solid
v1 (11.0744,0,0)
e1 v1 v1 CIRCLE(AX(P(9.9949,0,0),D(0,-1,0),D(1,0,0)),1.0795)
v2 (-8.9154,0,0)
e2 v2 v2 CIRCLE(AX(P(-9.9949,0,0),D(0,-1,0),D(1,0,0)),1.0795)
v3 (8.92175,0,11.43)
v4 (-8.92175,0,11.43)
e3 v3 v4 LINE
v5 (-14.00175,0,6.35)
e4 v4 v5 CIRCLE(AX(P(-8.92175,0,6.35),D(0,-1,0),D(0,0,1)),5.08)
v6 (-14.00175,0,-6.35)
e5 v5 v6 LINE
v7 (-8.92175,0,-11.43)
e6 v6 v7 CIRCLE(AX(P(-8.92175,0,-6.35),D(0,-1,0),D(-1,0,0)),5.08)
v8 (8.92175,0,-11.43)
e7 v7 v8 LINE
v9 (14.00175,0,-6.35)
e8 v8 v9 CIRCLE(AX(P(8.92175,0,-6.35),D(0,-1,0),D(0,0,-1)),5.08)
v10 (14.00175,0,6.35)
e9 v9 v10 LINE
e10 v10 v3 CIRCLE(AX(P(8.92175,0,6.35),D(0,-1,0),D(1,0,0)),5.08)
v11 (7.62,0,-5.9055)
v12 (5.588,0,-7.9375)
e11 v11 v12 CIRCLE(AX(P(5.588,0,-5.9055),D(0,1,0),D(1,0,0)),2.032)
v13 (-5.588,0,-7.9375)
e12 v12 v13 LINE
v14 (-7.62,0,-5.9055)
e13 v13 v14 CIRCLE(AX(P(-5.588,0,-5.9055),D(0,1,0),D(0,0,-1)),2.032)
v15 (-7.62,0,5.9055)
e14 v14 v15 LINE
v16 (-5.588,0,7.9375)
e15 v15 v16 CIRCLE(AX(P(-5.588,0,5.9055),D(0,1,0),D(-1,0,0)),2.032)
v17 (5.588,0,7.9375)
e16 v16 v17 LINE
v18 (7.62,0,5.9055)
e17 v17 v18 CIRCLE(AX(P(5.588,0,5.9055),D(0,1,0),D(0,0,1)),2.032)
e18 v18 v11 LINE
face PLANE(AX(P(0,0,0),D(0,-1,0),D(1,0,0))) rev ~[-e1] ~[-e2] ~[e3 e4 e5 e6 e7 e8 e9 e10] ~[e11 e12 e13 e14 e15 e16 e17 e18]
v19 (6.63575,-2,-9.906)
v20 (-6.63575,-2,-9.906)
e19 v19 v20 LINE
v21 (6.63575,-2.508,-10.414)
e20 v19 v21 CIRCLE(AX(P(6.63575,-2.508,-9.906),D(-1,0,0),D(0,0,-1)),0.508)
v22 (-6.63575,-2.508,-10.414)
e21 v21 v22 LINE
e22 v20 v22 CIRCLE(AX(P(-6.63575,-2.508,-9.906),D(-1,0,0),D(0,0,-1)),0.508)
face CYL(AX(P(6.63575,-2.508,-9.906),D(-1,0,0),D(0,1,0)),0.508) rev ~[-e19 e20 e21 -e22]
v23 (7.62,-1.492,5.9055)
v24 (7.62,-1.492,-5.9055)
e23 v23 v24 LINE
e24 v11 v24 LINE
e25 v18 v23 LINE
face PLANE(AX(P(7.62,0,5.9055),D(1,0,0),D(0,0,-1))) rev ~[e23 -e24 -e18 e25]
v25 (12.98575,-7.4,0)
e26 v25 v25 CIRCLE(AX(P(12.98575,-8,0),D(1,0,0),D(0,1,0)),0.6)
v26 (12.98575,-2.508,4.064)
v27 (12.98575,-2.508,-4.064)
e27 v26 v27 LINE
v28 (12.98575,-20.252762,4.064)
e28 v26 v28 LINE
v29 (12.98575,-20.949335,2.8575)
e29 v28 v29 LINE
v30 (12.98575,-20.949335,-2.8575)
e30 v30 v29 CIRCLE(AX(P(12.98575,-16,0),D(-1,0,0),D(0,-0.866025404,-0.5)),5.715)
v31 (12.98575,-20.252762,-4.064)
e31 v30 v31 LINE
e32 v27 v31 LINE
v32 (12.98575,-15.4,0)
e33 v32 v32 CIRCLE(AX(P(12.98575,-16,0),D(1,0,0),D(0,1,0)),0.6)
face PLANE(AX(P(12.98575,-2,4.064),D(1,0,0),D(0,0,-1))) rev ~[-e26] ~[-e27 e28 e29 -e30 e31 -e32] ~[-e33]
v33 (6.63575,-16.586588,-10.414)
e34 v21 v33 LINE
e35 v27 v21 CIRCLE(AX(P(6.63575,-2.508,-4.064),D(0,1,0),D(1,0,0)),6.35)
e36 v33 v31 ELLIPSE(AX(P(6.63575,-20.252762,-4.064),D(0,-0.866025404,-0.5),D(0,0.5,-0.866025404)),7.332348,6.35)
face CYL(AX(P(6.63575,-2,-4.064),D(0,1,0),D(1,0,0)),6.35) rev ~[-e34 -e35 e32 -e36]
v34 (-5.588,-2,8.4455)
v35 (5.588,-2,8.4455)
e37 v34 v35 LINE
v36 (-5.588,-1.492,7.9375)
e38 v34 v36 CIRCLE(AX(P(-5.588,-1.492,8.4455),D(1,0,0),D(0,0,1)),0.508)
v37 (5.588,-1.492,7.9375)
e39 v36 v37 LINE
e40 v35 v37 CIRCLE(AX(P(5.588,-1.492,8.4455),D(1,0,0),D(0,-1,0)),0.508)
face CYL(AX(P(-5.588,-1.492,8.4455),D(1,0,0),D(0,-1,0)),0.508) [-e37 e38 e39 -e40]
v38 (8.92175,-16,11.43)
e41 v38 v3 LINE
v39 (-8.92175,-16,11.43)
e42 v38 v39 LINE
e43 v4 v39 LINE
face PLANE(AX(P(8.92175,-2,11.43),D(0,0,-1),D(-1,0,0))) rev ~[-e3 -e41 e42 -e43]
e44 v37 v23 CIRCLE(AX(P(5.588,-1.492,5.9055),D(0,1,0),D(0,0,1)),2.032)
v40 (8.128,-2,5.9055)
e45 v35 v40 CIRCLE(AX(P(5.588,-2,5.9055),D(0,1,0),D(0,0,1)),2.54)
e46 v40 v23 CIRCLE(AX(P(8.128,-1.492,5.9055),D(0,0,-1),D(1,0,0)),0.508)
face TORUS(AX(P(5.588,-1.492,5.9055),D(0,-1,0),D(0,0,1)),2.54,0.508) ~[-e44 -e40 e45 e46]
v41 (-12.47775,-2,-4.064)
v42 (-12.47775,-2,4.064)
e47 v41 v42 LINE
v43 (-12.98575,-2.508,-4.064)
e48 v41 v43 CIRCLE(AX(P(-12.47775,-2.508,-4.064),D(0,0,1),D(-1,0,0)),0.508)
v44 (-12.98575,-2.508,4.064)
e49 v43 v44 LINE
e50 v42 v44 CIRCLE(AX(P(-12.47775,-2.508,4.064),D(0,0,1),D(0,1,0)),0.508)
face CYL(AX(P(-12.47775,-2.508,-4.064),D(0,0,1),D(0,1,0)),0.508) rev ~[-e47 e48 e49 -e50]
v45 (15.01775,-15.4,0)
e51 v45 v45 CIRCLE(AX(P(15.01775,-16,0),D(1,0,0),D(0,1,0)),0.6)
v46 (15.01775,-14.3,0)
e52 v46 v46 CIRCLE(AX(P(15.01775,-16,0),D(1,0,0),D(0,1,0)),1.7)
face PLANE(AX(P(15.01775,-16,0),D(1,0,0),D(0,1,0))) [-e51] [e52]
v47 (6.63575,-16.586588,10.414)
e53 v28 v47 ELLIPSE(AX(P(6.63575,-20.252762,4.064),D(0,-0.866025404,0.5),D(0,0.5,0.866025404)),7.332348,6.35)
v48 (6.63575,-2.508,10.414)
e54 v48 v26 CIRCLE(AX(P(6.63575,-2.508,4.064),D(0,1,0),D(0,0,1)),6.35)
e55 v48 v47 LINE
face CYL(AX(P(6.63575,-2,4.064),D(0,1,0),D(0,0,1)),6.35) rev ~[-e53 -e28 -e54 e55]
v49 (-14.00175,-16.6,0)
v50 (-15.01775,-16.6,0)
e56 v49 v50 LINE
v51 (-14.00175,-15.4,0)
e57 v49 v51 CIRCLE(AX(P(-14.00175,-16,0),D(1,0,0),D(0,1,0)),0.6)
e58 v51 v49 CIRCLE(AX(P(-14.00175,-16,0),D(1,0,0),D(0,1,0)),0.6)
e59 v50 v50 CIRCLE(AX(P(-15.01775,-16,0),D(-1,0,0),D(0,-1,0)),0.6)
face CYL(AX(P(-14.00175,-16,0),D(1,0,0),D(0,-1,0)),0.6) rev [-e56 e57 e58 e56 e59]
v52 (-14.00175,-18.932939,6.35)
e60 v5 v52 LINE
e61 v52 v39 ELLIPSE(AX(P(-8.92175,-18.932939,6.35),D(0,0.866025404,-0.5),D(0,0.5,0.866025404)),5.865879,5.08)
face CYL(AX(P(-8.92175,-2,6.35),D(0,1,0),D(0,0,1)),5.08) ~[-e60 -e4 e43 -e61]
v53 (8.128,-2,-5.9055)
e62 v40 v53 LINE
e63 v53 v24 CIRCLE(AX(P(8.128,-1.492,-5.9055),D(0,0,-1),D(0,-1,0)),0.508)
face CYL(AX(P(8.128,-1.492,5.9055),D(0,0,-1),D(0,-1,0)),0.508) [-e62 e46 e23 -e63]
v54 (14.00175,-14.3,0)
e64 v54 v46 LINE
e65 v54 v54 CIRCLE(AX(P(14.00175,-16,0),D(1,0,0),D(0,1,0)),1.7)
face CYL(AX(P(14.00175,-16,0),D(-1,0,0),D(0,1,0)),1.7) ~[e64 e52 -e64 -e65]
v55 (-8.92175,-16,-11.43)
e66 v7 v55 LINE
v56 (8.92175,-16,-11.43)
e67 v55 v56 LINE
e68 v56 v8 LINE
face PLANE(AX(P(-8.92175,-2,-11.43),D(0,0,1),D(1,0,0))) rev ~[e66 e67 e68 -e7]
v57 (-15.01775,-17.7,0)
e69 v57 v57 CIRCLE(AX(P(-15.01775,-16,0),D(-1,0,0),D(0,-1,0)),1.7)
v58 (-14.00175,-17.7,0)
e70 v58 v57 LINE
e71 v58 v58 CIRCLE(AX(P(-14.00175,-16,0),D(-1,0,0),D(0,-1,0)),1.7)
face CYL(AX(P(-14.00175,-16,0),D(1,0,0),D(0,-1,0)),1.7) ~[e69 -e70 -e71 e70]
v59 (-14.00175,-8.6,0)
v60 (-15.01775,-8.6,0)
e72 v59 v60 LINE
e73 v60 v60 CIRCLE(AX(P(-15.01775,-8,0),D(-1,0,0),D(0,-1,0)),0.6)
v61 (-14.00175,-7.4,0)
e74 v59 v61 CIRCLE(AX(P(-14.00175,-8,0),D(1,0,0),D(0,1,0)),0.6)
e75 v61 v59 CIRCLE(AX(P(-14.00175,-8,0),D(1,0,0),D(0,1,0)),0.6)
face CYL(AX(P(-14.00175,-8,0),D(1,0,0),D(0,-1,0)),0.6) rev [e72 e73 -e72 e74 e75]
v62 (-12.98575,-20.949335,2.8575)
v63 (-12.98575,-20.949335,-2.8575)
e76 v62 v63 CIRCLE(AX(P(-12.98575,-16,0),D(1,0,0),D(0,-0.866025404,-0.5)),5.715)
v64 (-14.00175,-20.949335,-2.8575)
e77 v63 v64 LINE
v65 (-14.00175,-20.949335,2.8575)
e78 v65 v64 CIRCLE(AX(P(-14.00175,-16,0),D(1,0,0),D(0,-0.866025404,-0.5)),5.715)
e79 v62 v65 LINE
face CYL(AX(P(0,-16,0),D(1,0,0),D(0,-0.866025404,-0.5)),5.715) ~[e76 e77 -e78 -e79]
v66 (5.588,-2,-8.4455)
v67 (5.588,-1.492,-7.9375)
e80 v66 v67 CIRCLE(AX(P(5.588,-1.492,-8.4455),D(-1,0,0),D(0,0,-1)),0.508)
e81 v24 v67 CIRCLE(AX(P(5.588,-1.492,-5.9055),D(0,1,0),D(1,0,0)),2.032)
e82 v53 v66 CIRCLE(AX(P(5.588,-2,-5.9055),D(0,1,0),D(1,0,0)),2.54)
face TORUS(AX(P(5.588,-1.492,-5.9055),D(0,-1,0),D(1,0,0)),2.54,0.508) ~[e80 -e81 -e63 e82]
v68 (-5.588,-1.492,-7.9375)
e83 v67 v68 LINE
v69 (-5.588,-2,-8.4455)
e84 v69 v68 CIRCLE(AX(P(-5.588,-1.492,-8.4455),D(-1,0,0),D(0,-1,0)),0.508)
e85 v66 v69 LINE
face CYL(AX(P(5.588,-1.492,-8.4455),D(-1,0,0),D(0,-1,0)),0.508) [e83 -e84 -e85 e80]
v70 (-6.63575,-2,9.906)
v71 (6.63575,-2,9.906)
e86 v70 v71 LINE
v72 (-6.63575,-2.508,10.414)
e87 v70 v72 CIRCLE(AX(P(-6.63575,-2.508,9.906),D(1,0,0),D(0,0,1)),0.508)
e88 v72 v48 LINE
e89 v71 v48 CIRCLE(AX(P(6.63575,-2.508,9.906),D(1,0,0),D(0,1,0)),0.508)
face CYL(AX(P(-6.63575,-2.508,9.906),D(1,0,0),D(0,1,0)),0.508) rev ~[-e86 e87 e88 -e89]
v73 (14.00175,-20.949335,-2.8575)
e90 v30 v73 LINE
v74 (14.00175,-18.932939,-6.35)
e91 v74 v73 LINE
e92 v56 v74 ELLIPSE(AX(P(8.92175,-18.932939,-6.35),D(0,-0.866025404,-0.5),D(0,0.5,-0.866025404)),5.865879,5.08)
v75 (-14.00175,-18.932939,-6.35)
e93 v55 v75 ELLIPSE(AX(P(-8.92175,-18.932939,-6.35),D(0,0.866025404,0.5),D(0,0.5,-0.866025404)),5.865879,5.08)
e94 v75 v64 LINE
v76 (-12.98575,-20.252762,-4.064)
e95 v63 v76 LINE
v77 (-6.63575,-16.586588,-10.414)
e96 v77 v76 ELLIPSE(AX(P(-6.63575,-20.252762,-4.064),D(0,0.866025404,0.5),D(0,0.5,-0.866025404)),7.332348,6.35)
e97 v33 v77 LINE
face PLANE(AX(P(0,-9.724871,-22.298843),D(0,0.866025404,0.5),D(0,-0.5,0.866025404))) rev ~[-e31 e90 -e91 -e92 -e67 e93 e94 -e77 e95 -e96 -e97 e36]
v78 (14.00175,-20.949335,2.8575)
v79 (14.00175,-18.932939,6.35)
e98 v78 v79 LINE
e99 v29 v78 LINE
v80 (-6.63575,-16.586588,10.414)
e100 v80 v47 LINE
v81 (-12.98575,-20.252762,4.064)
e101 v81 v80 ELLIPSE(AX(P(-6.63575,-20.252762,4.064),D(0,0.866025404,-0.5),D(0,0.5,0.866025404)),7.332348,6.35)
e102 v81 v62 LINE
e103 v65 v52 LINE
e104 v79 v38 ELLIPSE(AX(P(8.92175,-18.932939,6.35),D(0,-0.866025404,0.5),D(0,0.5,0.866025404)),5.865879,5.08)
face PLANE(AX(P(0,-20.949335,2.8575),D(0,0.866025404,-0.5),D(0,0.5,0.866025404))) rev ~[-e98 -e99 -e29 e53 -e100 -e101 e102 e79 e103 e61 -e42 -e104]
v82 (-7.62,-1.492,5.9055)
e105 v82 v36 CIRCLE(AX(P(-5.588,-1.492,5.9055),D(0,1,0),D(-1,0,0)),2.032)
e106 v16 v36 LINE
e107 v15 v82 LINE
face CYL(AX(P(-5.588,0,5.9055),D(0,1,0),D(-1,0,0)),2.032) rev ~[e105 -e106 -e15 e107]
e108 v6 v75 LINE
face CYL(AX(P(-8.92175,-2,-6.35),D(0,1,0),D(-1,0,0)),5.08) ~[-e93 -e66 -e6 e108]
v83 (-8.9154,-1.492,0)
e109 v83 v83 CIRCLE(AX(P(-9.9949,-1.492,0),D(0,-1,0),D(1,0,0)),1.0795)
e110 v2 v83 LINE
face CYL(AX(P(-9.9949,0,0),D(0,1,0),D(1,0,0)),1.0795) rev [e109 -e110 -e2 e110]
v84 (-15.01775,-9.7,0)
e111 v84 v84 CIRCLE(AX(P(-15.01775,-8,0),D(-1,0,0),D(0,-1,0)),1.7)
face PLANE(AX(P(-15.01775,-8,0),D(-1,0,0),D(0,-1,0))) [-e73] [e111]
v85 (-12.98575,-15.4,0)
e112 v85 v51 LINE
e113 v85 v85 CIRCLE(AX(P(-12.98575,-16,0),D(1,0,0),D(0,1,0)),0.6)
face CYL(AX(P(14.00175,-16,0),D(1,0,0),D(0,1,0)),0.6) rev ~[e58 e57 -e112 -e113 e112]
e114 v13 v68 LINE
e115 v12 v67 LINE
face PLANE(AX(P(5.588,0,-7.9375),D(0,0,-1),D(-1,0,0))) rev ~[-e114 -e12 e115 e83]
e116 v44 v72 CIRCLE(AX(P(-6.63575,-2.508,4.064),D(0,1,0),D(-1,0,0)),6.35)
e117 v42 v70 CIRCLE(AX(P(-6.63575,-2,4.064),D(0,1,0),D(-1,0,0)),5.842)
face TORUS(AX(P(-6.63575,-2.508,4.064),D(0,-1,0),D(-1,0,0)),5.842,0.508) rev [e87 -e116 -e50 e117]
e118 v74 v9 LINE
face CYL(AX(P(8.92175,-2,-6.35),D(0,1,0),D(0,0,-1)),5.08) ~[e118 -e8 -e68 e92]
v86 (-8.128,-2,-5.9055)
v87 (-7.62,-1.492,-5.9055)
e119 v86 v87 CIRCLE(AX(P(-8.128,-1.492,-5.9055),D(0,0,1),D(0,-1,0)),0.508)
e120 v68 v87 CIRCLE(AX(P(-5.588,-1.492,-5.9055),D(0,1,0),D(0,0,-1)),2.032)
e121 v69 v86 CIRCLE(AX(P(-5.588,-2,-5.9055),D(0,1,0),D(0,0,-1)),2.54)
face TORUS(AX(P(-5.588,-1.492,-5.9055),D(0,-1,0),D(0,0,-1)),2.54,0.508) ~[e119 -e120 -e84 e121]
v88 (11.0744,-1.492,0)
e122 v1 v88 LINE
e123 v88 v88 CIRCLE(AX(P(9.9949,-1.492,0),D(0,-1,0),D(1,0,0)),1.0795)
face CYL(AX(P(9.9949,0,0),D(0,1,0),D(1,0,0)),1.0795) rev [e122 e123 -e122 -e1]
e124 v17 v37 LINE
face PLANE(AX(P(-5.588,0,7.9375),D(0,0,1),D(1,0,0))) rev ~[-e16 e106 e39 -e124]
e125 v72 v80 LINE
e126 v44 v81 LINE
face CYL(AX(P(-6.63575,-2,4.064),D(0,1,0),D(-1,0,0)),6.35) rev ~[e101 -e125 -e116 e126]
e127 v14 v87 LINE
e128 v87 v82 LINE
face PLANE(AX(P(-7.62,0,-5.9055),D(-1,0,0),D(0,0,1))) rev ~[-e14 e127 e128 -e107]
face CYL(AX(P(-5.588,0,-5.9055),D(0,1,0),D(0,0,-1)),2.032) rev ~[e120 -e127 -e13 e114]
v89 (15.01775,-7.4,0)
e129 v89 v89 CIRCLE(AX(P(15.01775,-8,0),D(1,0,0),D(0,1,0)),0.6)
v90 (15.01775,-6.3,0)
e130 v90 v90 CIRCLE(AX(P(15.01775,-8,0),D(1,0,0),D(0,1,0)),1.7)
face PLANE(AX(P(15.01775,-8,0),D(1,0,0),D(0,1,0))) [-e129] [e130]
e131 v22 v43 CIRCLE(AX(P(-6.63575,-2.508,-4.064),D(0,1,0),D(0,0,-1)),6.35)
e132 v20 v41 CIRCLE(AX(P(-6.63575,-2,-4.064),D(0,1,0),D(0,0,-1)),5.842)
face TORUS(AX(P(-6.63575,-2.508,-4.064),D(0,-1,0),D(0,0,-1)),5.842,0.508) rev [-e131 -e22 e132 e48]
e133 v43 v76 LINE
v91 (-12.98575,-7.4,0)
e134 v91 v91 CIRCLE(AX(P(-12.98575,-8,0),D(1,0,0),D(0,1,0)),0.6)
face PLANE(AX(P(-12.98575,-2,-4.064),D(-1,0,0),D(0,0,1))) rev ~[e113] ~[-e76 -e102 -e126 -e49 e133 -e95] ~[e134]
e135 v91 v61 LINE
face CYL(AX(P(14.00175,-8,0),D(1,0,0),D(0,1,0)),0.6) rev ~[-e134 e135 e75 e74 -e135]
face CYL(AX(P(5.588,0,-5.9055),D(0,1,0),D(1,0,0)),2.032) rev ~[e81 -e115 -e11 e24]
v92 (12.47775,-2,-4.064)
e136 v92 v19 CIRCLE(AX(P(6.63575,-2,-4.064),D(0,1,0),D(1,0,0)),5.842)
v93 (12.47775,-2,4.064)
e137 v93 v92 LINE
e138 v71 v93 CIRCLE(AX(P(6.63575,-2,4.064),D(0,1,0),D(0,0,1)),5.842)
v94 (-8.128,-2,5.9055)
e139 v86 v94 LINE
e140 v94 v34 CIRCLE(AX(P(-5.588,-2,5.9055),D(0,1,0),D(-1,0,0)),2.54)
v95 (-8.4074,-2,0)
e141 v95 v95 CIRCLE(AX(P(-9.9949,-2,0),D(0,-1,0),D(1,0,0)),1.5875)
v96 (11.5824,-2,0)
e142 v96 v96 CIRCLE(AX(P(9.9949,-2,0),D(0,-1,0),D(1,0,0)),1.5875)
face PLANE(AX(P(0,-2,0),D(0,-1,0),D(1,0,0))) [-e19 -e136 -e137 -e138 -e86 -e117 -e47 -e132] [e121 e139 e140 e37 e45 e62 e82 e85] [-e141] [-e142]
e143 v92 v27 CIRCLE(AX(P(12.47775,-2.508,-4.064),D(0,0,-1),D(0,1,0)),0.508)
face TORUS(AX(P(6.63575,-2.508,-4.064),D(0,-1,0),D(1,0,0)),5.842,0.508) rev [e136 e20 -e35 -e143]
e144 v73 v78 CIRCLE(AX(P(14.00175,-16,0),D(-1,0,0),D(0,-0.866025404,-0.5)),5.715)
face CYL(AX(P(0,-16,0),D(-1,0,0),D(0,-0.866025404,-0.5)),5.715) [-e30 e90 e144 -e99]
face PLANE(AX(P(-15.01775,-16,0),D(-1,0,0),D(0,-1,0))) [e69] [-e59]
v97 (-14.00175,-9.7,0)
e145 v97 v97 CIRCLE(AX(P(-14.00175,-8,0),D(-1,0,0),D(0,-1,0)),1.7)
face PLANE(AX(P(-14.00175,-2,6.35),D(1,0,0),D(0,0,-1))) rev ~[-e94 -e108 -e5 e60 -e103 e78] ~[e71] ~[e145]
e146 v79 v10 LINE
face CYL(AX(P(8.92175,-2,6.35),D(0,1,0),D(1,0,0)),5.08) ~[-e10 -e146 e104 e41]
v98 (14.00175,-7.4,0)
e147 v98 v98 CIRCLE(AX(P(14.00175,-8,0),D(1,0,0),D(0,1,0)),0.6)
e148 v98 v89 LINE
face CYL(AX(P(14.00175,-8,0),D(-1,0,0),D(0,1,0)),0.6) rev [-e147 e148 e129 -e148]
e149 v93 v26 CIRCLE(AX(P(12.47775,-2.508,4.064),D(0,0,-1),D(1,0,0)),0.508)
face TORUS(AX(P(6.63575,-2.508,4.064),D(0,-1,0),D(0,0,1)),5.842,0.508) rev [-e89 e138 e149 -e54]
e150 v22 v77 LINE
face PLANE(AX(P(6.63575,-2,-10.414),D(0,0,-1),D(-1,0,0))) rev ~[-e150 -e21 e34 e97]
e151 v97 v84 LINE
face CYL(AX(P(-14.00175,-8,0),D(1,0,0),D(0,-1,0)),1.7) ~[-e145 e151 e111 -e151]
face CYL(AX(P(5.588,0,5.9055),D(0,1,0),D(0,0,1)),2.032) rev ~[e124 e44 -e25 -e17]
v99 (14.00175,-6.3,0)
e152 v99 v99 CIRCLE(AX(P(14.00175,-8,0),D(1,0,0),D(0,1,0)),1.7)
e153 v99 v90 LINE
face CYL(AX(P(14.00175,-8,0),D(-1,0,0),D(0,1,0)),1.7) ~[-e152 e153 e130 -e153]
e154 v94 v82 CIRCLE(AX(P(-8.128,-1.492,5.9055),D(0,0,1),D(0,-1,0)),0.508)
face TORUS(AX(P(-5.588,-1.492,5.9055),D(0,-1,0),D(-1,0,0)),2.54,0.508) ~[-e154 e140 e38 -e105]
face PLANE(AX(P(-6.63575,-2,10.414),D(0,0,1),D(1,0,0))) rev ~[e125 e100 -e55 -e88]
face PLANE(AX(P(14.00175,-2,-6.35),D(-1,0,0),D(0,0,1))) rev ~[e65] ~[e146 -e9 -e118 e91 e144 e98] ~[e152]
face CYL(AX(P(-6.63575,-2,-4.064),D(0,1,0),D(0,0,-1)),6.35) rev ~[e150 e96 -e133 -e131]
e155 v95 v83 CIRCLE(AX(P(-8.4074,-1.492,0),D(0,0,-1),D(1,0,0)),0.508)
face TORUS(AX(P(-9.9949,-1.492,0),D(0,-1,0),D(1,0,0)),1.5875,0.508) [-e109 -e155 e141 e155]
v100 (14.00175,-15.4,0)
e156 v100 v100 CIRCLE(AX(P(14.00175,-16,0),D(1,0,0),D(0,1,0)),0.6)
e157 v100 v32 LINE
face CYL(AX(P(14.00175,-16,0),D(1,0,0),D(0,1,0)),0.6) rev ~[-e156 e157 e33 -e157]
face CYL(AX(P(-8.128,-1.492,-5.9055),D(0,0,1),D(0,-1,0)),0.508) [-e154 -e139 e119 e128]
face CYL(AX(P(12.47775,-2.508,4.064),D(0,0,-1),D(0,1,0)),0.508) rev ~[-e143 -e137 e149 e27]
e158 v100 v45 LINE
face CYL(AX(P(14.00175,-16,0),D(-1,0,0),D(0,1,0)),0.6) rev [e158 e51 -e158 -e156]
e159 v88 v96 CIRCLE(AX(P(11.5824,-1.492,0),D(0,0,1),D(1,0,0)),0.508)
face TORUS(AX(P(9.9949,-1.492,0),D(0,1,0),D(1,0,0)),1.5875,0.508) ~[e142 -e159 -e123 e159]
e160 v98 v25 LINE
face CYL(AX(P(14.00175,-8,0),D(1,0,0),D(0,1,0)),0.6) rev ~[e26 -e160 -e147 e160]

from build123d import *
from build123d import SkipClean  # not in build123d's __all__

# Parameters (mm, degrees)
F0_R           = 1.0795
F1_DEPTH       = 2
F3_DEPTH       = 19.9898
F4_R           = 0.508
F5_R           = 0.6
F6_DEPTH       = 28.0045
F7_R           = 1.7
F7_R_2         = 0.6
F8_DEPTH       = 1.016
F9_R           = 1.7
F9_R_2         = 0.6
F10_DEPTH      = 1.016
F12_DEPTH      = 15.01875
F12_DEPTH_BACK = 15.01875


# Not quite as in the source:
# - after a boolean that leaves OpenCascade's solid faulty, fix() repairs it


with BuildPart() as f1:
    # F0 (on Front) → F1 (new body)
    with BuildSketch(Plane.XZ):
        with BuildLine():
            Line((8.92175, 11.43), (-8.92175, 11.43))
            ThreePointArc((-8.92175, 11.43), (-12.5138524484, 9.9421024484), (-14.00175, 6.35))
            Line((-14.00175, 6.35), (-14.00175, -6.35))
            ThreePointArc((-14.00175, -6.35), (-12.5138524484, -9.9421024484), (-8.92175, -11.43))
            Line((-8.92175, -11.43), (8.92175, -11.43))
            ThreePointArc((8.92175, -11.43), (12.5138524484, -9.9421024484), (14.00175, -6.35))
            Line((14.00175, -6.35), (14.00175, 6.35))
            ThreePointArc((14.00175, 6.35), (12.5138524484, 9.9421024484), (8.92175, 11.43))
        make_face()
        with Locations((-9.9949, 0)):
            Circle(F0_R, mode=Mode.SUBTRACT)
        with BuildLine():
            ThreePointArc((-7.62, 5.9055), (-7.0248409794, 7.3423409794), (-5.588, 7.9375))
            Line((-5.588, 7.9375), (5.588, 7.9375))
            ThreePointArc((5.588, 7.9375), (7.0248409794, 7.3423409794), (7.62, 5.9055))
            Line((7.62, 5.9055), (7.62, -5.9055))
            ThreePointArc((7.62, -5.9055), (7.0248409794, -7.3423409794), (5.588, -7.9375))
            Line((5.588, -7.9375), (-5.588, -7.9375))
            ThreePointArc((-5.588, -7.9375), (-7.0248409794, -7.3423409794), (-7.62, -5.9055))
            Line((-7.62, -5.9055), (-7.62, 5.9055))
        make_face(mode=Mode.SUBTRACT)
        with Locations((9.9949, 0)):
            Circle(F0_R, mode=Mode.SUBTRACT)
    extrude(amount=F1_DEPTH)

    # F2 (on face) → F3 (join)
    with BuildSketch(Plane.XZ.offset(2)):
        with BuildLine():
            Line((8.92175, 11.43), (-8.92175, 11.43))
            ThreePointArc((-8.92175, 11.43), (-12.5138524484, 9.9421024484), (-14.00175, 6.35))
            Line((-14.00175, 6.35), (-14.00175, -6.35))
            ThreePointArc((-14.00175, -6.35), (-12.5138524484, -9.9421024484), (-8.92175, -11.43))
            Line((-8.92175, -11.43), (8.92175, -11.43))
            ThreePointArc((8.92175, -11.43), (12.5138524484, -9.9421024484), (14.00175, -6.35))
            Line((14.00175, -6.35), (14.00175, 6.35))
            ThreePointArc((14.00175, 6.35), (12.5138524484, 9.9421024484), (8.92175, 11.43))
        make_face()
        with BuildLine():
            ThreePointArc((-12.98575, 4.064), (-11.1258780605, 8.5541280605), (-6.63575, 10.414))
            Line((-6.63575, 10.414), (6.63575, 10.414))
            ThreePointArc((6.63575, 10.414), (11.1258780605, 8.5541280605), (12.98575, 4.064))
            Line((12.98575, 4.064), (12.98575, -4.064))
            ThreePointArc((12.98575, -4.064), (11.1258780605, -8.5541280605), (6.63575, -10.414))
            Line((6.63575, -10.414), (-6.63575, -10.414))
            ThreePointArc((-6.63575, -10.414), (-11.1258780605, -8.5541280605), (-12.98575, -4.064))
            Line((-12.98575, -4.064), (-12.98575, 4.064))
        make_face(mode=Mode.SUBTRACT)
    extrude(amount=F3_DEPTH)

    # F4
    f4_edges = [f1.edges().sort_by_distance(p)[0] for p in [
        (-11.125878, -2, -8.554128),
        (-12.98575, -2, 0),
        (-11.125878, -2, 8.554128),
        (0, -2, 10.414),
        (11.125878, -2, 8.554128),
        (12.98575, -2, 0),
        (11.125878, -2, -8.554128),
        (0, -2, -10.414),
        (-11.0744, -2, 0),
        (-7.62, -2, 0),
        (-7.024841, -2, -7.342341),
        (-7.024841, -2, 7.342341),
        (0, -2, -7.9375),
        (0, -2, 7.9375),
        (7.024841, -2, -7.342341),
        (7.024841, -2, 7.342341),
        (7.62, -2, 0),
        (8.9154, -2, 0),
    ]]
    fillet(f4_edges, radius=F4_R)

    # F5 (on face) → F6 (cut, through all)
    with BuildSketch(Plane.YZ.offset(14.00175)):
        with Locations((-8, 0)):
            Circle(F5_R)
        with Locations((-16, 0)):
            Circle(F5_R)
    extrude(amount=-F6_DEPTH, mode=Mode.SUBTRACT)

    # F7 (on face) → F8 (join)
    with BuildSketch(Plane.YZ.offset(14.00175)):
        with Locations((-8, 0)):
            Circle(F7_R)
        with Locations((-8, 0)):
            Circle(F7_R_2, mode=Mode.SUBTRACT)
        with Locations((-16, 0)):
            Circle(F7_R)
        with Locations((-16, 0)):
            Circle(F7_R_2, mode=Mode.SUBTRACT)
    extrude(amount=F8_DEPTH)

    # F9 (on face) → F10 (join)
    with BuildSketch(Plane(origin=(-14.00175, 0, 0), x_dir=(0, -1, 0), z_dir=(-1, 0, 0))):
        with Locations((16, 0)):
            Circle(F9_R)
        with Locations((16, 0)):
            Circle(F9_R_2, mode=Mode.SUBTRACT)
        with Locations((8, 0)):
            Circle(F9_R)
        with Locations((8, 0)):
            Circle(F9_R_2, mode=Mode.SUBTRACT)
    with SkipClean():  # cleaning this boolean's faces spoils the solid; the shape is the same uncleaned
        extrude(amount=F10_DEPTH)

    # F11 (on Right) → F12 (cut, two sides)
    with BuildSketch(Plane.YZ) as f12_sk:
        with BuildLine():
            ThreePointArc((-20.9493351826, -2.8575), (-21.715, 0), (-20.9493351826, 2.8575))
            Line((-20.9493351826, 2.8575), (-14.935231149, 13.2742337482))
            Line((-14.935231149, 13.2742337482), (-27.6412566526, 12.4483415457))
            Line((-27.6412566526, 12.4483415457), (-27.6412566526, -22.2988429875))
            Line((-27.6412566526, -22.2988429875), (-9.7248705754, -22.2988429875))
            Line((-9.7248705754, -22.2988429875), (-20.9493351826, -2.8575))
        make_face()
    extrude(amount=-F12_DEPTH, mode=Mode.SUBTRACT)
    extrude(f12_sk.sketch, amount=F12_DEPTH_BACK, mode=Mode.SUBTRACT)

    add(f1.part.fix(), mode=Mode.REPLACE)


solid = f1.part
